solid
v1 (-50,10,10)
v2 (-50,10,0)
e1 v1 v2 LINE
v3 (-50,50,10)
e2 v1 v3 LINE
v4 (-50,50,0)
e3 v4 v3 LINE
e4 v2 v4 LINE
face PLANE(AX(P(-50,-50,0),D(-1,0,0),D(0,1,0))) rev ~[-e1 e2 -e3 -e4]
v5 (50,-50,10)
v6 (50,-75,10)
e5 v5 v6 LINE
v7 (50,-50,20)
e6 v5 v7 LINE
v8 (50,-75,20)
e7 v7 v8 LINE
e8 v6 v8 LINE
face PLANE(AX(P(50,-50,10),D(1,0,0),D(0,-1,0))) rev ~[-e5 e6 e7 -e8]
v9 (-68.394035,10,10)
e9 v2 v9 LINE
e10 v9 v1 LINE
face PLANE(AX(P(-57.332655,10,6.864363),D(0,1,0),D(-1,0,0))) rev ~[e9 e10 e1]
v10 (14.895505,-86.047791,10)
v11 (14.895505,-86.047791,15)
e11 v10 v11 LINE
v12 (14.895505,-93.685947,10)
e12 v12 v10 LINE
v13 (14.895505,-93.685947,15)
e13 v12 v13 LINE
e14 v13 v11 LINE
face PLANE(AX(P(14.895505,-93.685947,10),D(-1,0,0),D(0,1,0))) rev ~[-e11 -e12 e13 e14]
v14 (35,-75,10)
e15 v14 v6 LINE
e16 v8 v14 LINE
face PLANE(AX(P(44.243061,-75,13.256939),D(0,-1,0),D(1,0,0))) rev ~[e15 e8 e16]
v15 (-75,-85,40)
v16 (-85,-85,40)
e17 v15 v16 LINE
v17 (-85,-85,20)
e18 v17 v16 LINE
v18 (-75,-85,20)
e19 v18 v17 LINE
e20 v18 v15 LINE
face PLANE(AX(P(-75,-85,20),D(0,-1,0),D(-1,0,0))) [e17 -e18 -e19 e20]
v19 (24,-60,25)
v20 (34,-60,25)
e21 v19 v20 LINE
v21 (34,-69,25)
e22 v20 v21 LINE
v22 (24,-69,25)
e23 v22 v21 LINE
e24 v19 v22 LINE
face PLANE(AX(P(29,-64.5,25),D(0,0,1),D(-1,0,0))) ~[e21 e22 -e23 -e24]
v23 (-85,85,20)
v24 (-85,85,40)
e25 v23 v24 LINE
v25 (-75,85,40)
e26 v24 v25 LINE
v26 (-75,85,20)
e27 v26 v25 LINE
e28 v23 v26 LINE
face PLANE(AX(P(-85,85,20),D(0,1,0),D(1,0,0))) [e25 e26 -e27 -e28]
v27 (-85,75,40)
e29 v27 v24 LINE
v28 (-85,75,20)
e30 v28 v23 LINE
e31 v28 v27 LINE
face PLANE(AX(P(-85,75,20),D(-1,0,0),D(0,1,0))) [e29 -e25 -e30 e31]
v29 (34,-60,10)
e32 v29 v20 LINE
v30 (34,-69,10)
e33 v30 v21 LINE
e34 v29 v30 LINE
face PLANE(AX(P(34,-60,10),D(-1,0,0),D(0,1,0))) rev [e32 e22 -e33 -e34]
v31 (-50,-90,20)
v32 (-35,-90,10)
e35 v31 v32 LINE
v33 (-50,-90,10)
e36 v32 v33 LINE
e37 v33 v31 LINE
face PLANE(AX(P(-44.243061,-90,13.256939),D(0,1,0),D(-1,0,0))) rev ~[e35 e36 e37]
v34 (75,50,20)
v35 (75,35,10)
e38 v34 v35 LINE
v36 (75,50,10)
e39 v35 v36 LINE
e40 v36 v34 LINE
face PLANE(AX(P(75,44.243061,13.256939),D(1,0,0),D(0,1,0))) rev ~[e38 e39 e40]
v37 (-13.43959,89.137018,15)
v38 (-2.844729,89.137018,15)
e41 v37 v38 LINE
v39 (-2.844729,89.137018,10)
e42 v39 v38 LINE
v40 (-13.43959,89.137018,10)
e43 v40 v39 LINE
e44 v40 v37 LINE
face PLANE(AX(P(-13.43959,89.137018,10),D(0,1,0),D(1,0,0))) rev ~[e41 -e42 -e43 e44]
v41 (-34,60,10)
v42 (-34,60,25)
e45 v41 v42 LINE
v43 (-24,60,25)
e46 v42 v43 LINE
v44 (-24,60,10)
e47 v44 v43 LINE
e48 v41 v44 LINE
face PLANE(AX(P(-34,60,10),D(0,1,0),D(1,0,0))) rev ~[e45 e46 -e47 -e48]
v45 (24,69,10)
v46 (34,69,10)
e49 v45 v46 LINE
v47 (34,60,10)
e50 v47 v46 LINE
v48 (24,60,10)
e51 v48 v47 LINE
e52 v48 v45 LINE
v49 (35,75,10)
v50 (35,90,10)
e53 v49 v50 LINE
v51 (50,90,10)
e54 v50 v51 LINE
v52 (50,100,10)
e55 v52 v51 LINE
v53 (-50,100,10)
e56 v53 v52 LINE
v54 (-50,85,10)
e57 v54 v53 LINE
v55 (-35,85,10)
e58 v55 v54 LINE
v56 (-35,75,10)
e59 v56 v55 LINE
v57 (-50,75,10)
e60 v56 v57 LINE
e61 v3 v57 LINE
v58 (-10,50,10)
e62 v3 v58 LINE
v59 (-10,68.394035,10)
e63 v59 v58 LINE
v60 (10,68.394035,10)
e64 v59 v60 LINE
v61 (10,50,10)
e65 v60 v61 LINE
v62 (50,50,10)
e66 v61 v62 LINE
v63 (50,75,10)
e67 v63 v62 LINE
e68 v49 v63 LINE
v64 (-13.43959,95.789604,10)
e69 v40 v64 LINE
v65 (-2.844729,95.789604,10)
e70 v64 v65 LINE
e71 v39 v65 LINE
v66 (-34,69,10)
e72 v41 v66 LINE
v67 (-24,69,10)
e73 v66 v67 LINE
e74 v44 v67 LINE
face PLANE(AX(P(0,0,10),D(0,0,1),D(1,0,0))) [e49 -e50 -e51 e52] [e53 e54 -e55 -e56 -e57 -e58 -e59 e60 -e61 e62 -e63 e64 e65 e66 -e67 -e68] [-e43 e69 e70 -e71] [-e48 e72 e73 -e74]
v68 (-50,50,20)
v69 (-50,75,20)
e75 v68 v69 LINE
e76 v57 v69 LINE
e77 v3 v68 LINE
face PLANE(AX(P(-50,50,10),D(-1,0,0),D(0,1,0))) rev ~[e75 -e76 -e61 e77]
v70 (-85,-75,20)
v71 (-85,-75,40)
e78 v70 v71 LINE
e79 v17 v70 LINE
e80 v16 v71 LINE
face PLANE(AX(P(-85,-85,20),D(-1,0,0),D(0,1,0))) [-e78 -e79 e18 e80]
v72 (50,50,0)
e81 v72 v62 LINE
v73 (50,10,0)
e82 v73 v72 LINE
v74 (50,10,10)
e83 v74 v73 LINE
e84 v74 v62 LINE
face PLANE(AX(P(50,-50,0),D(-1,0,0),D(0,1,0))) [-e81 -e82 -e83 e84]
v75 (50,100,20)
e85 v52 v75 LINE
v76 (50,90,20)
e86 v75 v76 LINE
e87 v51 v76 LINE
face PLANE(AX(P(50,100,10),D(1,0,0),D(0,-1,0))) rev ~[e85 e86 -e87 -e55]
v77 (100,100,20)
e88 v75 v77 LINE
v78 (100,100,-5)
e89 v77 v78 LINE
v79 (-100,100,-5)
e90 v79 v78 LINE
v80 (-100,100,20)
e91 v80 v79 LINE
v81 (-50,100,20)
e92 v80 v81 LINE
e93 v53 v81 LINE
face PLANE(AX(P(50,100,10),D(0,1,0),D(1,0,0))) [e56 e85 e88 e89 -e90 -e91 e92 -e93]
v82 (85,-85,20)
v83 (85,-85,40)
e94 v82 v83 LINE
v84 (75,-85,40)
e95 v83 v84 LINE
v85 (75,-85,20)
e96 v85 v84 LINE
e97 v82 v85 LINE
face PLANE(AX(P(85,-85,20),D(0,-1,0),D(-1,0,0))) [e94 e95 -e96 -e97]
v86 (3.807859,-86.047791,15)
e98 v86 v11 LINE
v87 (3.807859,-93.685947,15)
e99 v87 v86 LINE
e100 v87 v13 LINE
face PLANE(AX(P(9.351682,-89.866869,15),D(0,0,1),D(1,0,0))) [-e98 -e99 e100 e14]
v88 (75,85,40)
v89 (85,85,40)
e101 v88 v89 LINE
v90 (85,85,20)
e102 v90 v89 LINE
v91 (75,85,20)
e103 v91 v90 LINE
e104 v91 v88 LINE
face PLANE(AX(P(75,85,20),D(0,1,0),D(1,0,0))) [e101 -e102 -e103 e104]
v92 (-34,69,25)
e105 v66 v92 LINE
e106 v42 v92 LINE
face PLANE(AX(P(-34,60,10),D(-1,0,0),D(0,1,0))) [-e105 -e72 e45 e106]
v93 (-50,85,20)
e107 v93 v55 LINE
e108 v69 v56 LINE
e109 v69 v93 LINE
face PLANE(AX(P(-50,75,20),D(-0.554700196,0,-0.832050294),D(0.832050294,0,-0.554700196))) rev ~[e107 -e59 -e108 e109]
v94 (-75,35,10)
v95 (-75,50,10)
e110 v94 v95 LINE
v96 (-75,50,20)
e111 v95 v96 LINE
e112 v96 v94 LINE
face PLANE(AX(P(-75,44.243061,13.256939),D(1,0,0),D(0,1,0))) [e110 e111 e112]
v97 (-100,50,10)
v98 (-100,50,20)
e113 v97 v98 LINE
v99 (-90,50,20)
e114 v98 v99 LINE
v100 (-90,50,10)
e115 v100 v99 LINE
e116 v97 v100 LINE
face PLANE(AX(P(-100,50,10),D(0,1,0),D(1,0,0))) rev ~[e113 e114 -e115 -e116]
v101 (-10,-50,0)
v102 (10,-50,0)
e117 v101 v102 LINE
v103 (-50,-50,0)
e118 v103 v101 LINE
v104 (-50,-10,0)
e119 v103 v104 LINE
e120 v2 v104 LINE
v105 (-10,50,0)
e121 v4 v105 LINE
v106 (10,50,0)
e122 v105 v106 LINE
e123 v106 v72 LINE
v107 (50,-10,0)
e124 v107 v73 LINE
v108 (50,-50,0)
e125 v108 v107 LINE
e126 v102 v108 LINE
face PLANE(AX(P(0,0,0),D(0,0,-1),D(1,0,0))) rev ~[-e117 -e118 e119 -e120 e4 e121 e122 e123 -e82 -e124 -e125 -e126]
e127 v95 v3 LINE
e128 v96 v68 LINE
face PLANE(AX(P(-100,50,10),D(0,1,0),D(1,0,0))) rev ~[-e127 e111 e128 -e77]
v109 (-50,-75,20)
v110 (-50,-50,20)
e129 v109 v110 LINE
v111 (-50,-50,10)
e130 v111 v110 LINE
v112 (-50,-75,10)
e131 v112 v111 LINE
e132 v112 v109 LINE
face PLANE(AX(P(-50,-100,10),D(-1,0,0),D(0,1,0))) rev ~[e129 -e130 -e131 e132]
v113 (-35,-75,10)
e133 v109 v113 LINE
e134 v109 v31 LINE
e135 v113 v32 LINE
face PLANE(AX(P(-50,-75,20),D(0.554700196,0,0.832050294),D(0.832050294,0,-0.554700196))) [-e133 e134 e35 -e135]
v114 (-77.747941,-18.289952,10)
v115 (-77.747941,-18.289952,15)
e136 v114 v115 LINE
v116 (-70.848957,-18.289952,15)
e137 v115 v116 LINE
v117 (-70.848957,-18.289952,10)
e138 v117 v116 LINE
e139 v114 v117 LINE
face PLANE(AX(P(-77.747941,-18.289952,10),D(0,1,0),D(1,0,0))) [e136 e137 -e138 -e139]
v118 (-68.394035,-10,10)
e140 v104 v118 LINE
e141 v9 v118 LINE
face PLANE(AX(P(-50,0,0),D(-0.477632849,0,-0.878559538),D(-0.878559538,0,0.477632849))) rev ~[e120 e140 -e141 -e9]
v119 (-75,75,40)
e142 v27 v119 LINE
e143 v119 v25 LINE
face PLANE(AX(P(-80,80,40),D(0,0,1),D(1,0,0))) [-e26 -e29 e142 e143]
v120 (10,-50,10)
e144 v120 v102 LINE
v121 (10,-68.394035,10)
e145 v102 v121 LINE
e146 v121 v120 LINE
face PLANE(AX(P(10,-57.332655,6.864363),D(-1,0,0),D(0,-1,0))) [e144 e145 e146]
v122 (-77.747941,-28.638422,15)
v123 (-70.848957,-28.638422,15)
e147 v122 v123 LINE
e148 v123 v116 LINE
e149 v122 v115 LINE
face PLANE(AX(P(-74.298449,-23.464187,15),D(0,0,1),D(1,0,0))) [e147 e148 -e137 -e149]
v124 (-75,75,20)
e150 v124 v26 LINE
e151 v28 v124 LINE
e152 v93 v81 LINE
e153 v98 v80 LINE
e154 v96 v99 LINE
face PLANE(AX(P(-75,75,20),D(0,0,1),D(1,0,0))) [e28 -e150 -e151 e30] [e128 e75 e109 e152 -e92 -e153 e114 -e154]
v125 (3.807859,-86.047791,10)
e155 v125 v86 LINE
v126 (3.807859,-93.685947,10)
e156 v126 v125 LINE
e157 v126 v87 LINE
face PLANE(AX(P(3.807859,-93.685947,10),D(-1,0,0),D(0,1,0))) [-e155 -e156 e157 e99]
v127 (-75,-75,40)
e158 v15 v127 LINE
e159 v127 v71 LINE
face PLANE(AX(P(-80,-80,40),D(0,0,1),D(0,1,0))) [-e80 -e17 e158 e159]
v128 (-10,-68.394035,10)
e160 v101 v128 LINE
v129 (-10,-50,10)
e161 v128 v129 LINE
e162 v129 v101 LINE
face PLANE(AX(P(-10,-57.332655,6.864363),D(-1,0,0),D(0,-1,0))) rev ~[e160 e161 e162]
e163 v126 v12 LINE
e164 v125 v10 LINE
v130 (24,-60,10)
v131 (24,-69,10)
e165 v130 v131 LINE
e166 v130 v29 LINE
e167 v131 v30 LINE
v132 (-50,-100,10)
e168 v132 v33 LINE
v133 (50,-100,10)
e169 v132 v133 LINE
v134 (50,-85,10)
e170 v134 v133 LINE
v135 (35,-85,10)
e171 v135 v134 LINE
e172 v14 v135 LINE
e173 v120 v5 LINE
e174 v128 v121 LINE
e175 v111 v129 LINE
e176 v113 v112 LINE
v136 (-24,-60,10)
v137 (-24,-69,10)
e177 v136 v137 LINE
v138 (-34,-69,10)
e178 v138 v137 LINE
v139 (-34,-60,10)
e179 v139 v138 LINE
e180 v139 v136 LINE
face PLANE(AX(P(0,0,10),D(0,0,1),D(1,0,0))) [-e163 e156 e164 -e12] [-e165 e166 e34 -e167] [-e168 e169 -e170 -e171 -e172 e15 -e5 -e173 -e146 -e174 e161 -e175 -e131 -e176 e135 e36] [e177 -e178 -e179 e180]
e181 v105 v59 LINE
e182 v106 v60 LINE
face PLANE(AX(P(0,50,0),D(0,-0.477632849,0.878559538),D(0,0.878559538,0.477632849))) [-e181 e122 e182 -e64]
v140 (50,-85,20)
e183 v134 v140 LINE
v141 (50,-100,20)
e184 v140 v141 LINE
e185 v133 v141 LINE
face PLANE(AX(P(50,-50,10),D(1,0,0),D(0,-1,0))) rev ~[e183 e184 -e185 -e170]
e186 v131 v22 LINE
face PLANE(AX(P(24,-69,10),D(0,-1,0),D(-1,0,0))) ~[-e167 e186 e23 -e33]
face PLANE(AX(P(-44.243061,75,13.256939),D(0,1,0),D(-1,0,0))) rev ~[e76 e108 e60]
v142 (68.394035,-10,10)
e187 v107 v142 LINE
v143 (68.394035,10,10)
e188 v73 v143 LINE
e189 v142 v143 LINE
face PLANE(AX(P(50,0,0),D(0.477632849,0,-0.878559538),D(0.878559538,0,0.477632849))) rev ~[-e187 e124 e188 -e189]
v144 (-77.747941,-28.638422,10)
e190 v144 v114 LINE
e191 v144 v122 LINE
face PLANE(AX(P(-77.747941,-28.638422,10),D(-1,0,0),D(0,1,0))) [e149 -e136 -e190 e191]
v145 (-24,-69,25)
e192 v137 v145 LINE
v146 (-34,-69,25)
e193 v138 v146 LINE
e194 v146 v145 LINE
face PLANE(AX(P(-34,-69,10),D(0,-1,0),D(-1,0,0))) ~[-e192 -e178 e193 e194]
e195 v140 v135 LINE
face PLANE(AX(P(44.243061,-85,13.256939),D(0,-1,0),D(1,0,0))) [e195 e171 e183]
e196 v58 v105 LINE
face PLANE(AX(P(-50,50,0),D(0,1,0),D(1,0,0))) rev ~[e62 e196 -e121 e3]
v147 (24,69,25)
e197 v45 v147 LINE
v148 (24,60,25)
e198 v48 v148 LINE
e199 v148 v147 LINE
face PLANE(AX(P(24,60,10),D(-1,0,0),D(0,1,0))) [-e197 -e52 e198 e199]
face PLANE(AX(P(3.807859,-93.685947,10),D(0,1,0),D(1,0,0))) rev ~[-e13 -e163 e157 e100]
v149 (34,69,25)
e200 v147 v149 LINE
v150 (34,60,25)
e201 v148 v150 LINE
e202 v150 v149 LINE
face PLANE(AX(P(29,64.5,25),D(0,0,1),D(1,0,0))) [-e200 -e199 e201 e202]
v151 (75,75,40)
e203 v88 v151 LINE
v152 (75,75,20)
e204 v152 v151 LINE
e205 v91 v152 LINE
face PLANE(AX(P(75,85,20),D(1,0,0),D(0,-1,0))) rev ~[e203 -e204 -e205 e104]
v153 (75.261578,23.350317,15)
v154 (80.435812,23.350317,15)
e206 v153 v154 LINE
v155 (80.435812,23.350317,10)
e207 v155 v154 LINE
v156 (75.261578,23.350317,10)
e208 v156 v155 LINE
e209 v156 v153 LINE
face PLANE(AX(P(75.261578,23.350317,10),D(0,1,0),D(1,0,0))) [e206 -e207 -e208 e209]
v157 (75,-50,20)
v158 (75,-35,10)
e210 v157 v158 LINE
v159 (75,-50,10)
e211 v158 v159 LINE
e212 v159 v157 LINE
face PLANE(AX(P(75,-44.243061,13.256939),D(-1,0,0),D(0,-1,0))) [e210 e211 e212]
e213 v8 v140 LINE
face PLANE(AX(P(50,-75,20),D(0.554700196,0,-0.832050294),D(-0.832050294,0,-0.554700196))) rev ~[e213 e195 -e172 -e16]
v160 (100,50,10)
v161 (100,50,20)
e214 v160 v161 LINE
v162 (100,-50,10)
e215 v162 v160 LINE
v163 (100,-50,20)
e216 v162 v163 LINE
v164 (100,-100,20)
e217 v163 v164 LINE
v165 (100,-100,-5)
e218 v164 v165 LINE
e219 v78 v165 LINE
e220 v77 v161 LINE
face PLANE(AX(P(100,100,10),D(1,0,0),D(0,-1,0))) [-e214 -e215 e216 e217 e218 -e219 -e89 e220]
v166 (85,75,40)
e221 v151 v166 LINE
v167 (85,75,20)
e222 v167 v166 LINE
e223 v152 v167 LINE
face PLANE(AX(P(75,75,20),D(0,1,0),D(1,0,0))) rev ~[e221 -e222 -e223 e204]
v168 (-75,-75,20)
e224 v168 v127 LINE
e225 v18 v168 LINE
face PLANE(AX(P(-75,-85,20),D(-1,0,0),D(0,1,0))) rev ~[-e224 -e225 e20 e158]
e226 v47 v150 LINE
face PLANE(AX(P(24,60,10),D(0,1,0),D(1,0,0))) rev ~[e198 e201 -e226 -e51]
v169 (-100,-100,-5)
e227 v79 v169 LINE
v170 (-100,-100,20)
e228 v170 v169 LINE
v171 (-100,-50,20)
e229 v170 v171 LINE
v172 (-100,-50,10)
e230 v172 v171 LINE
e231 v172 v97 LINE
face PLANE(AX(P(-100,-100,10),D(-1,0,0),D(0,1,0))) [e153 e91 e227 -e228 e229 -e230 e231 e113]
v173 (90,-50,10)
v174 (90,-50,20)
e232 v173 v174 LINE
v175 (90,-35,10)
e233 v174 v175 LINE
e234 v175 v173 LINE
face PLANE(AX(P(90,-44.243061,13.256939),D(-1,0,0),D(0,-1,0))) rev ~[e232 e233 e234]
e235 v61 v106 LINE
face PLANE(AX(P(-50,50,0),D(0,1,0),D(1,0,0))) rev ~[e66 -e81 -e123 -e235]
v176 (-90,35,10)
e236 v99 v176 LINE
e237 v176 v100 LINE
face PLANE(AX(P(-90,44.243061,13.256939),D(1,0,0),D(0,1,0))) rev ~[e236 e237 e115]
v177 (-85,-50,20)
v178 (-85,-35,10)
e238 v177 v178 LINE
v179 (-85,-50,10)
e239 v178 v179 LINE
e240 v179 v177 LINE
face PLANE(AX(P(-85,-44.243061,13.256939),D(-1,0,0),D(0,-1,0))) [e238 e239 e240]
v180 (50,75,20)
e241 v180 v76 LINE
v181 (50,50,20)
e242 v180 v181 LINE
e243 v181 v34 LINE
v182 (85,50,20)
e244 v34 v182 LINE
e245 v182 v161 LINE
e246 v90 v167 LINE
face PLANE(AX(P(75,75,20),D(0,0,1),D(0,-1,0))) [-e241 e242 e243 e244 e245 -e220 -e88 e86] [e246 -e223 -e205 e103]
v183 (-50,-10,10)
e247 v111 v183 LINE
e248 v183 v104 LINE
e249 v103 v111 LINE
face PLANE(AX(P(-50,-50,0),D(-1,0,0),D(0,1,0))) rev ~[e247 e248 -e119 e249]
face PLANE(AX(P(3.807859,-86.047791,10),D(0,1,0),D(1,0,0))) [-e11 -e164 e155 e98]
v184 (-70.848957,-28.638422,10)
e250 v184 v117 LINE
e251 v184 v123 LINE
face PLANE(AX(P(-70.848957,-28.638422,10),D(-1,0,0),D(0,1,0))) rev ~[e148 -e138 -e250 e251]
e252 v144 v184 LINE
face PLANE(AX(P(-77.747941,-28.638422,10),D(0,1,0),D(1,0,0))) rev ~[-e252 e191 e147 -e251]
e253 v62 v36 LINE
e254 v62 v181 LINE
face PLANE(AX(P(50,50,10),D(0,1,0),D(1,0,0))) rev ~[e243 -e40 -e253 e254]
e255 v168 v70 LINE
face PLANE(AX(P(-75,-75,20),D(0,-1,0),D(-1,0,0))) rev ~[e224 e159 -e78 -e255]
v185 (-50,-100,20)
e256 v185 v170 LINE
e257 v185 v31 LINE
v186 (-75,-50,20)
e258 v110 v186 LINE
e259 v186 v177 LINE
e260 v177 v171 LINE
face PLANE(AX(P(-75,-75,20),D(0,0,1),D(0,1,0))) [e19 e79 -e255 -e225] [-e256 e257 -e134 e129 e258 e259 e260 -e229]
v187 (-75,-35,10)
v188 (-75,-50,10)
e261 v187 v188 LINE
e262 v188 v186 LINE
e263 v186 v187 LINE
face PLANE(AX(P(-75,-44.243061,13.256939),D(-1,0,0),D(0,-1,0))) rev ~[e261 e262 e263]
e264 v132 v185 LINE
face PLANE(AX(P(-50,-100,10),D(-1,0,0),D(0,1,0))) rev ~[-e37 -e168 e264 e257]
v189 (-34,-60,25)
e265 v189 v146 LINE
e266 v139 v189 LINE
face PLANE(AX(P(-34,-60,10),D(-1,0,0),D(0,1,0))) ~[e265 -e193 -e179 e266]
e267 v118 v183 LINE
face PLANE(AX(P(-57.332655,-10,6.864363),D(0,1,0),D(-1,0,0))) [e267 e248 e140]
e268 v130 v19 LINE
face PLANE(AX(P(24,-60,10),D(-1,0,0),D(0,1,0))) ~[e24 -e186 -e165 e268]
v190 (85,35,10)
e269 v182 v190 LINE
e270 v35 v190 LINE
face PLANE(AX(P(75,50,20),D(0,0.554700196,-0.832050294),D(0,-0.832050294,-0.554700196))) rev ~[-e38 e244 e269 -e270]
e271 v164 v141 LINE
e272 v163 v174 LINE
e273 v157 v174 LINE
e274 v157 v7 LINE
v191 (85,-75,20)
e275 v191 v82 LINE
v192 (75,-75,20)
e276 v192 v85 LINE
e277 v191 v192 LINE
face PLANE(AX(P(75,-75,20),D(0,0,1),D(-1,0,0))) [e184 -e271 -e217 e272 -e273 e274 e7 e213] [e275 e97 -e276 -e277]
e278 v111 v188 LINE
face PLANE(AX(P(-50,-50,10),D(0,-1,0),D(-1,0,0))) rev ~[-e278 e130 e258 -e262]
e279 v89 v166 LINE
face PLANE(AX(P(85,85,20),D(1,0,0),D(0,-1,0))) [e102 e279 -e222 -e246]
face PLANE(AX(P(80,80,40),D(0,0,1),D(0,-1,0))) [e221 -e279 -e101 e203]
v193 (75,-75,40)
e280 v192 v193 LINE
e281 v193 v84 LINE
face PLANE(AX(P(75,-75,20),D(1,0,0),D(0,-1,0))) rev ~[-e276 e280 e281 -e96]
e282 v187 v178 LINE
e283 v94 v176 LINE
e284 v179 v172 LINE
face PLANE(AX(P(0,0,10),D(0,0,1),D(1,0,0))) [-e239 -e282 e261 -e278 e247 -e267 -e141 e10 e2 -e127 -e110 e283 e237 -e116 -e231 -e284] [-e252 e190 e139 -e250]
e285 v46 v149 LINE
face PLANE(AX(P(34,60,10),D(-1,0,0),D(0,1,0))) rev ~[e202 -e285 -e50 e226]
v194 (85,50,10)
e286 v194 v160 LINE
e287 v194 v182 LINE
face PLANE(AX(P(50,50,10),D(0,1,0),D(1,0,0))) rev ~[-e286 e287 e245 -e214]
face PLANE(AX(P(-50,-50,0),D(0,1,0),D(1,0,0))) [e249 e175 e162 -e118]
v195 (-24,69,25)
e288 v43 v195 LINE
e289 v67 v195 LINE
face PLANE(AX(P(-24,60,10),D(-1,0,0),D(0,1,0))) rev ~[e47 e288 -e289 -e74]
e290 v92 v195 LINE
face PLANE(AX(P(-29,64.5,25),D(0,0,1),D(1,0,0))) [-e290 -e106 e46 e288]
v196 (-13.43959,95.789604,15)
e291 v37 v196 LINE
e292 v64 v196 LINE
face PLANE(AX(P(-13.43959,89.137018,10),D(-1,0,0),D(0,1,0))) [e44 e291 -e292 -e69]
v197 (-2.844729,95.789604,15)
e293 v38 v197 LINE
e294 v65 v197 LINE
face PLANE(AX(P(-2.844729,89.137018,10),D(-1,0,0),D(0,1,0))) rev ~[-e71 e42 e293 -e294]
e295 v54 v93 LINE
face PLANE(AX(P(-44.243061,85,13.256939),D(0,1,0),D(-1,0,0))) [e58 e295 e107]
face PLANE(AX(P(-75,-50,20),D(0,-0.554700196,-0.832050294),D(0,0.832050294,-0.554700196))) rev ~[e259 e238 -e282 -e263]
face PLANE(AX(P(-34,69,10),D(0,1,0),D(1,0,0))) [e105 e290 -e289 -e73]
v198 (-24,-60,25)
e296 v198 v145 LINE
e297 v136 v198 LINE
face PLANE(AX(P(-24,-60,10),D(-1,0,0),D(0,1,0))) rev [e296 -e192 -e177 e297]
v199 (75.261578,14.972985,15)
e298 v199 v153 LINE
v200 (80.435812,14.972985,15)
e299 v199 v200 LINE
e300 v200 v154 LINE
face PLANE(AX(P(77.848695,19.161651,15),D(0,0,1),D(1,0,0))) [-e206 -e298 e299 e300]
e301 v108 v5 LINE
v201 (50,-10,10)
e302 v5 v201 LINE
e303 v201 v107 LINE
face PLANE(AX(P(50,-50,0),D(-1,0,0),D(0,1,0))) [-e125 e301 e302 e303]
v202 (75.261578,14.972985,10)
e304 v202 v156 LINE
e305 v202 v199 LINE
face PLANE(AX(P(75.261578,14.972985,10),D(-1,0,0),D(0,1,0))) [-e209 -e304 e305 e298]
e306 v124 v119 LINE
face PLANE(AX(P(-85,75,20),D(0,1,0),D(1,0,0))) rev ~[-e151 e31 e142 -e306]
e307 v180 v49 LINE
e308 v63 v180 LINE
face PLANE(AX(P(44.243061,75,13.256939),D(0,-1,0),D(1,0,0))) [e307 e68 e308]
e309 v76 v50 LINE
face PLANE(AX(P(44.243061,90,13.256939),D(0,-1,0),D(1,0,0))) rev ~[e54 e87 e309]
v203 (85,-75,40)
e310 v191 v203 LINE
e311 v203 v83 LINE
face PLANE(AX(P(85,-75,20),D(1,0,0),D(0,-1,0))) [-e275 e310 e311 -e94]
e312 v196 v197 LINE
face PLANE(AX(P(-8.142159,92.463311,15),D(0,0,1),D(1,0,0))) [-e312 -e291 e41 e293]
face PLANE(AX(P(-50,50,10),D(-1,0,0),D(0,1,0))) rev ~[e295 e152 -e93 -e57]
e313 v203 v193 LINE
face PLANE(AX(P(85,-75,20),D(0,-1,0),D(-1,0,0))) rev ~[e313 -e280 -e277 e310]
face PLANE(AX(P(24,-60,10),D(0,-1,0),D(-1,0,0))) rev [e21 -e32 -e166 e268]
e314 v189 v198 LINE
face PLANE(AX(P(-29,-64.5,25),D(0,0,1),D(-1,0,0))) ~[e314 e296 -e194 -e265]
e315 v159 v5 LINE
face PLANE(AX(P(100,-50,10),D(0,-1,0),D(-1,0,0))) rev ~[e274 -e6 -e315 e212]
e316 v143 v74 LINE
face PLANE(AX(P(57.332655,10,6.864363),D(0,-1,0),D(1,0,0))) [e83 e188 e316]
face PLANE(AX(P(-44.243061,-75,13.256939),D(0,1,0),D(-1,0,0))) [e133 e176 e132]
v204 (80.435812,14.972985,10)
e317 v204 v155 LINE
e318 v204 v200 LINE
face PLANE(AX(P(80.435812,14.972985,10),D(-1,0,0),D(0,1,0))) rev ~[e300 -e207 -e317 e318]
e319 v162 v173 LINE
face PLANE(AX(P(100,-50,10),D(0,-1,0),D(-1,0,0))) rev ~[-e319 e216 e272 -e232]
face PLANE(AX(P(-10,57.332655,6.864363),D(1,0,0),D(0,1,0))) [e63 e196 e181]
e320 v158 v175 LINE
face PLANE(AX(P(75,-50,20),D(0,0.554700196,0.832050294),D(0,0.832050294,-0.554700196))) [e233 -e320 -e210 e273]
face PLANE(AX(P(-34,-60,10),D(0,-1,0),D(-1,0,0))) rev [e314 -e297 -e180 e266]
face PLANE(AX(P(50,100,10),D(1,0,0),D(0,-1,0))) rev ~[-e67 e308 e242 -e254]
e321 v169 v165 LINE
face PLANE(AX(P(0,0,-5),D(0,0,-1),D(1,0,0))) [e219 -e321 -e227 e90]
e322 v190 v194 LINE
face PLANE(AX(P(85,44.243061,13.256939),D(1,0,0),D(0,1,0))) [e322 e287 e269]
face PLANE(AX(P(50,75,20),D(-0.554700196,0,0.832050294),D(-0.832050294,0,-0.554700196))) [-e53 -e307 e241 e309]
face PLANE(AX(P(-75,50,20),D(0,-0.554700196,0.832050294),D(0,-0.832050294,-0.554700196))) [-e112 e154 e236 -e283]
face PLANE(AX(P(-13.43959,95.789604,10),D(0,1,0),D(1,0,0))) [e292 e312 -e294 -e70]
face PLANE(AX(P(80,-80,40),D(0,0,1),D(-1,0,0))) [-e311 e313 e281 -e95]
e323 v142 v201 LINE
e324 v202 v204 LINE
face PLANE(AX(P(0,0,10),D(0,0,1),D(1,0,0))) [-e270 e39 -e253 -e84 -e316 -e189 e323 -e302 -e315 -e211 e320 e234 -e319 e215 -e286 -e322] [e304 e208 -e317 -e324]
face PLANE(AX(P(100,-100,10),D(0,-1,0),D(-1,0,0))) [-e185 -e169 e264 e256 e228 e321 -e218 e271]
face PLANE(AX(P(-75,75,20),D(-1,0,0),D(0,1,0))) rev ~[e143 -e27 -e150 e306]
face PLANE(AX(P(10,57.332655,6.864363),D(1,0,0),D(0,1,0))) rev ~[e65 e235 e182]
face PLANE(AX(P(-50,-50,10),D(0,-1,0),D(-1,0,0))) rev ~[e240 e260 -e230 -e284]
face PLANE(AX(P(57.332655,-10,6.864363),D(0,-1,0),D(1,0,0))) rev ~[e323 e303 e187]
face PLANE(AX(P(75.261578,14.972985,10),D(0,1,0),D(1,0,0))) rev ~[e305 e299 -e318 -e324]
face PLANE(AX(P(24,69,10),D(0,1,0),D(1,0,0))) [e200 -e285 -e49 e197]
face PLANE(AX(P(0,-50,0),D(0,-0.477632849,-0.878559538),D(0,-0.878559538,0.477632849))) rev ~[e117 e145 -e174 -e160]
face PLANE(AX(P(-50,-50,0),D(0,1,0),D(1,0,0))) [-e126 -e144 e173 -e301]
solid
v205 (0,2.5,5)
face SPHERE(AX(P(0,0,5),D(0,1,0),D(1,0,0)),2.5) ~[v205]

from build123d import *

# Parameters (mm, degrees)
F0_W             = 200
F0_H             = 200
F0_W_2           = 100
F0_H_2           = 100
F1_DEPTH         = 10
F2_W             = 200
F2_H             = 200
F3_DEPTH         = 5
F5_DEPTH         = 10
F5_DEPTH_BACK    = 10
F5_COPIES_COUNT  = 4
F7_W             = 50
F7_H             = 50
F8_DEPTH         = 10
F8_COPIES_COUNT  = 4
F12_DEPTH        = 10
F12_COPIES_COUNT = 4
F15_DEPTH        = 15
F15_COPIES_COUNT = 4
F9_W             = 10
F9_H             = 10
F17_DEPTH        = 20
F17_COPIES_COUNT = 4
F18_W            = 10
F18_H            = 9
F19_DEPTH        = 15
F21_W            = 5.1742345095
F21_H            = 8.3773322403
F21_W_2          = 10.5948613491
F21_H_2          = 6.6525861621
F21_W_3          = 6.898984313
F21_H_3          = 10.3484708816
F21_W_4          = 11.0876462422
F21_H_4          = 7.638156414
F22_DEPTH        = 5


# Not quite as in the source:
# - a pattern or mirror of a feature is missing from the dataset's text; its kind, count and spacing are read off the source's solid


with BuildPart() as f1:
    # F0 (on Top) → F1 (new body)
    with BuildSketch(Plane.XY):
        Rectangle(F0_W, F0_H)
        Rectangle(F0_W_2, F0_H_2, mode=Mode.SUBTRACT)
    extrude(amount=F1_DEPTH)

    # F2 (on face) → F3 (join)
    with BuildSketch(Plane(origin=(0, 0, 0), x_dir=(1, 0, 0), z_dir=(0, 0, -1))):
        Rectangle(F2_W, F2_H)
    extrude(amount=F3_DEPTH)

    # F4 (on Right) → F5 (cut, two sides)
    with BuildSketch(Plane.YZ) as f5_sk:
        Polygon((68.3940351009, 10), (50, 10), (50, 0), align=None)
    f5 = extrude(amount=-F5_DEPTH, mode=Mode.SUBTRACT) + extrude(f5_sk.sketch, amount=F5_DEPTH_BACK, mode=Mode.SUBTRACT)

    # F5_copies: F5 ×4 about axis
    f5_copies_axis = Axis((0, 0, 0), (0, 0, 1))
    for i in range(1, F5_COPIES_COUNT):
        add(f5.rotate(f5_copies_axis, i * 360 / F5_COPIES_COUNT), mode=Mode.SUBTRACT)

    # F7 (on face) → F8 (join)
    with BuildSketch(Plane.XY.offset(10)):
        with Locations((-75, 75)):
            Rectangle(F7_W, F7_H)
    f8 = extrude(amount=F8_DEPTH)

    # F8_copies: F8 ×4 about axis
    f8_copies_axis = Axis((0, 0, 0), (0, 0, 1))
    for i in range(1, F8_COPIES_COUNT):
        add(f8.rotate(f8_copies_axis, i * 360 / F8_COPIES_COUNT))

    # F11 (on line) → F12 (join)
    with BuildSketch(Plane(origin=(0, 75, 0), x_dir=(-1, 0, 0), z_dir=(0, 1, 0))):
        Polygon((50, 10), (50, 20), (35, 10), align=None)
    f12 = extrude(amount=F12_DEPTH)

    # F12_copies: F12 ×4 about axis
    f12_copies_axis = Axis((0, 0, 0), (0, 0, 1))
    for i in range(1, F12_COPIES_COUNT):
        add(f12.rotate(f12_copies_axis, i * 360 / F12_COPIES_COUNT))

    # F14 (on line) → F15 (join)
    with BuildSketch(Plane.YZ.offset(-75)):
        Polygon((50, 10), (50, 20), (35, 10), align=None)
    f15 = extrude(amount=-F15_DEPTH)

    # F15_copies: F15 ×4 about axis
    f15_copies_axis = Axis((0, 0, 0), (0, 0, 1))
    for i in range(1, F15_COPIES_COUNT):
        add(f15.rotate(f15_copies_axis, i * 360 / F15_COPIES_COUNT))

    # F9 (on face) → F17 (join)
    with BuildSketch(Plane.XY.offset(20)):
        with Locations((-80, 80)):
            Rectangle(F9_W, F9_H)
    f17 = extrude(amount=F17_DEPTH)

    # F17_copies: F17 ×4 about axis
    f17_copies_axis = Axis((0, 0, 0), (0, 0, 1))
    for i in range(1, F17_COPIES_COUNT):
        add(f17.rotate(f17_copies_axis, i * 360 / F17_COPIES_COUNT))

    # F18 (on face) → F19 (join)
    with BuildSketch(Plane.XY.offset(10)):
        with Locations((-29, 64.5)):
            Rectangle(F18_W, F18_H)
        with Locations((29, 64.5)):
            Rectangle(F18_W, F18_H)
    f19 = extrude(amount=F19_DEPTH)

    # F19_copies: F19 across plane
    add(f19.mirror(Plane(origin=(0, 0, 0), x_dir=(0, 0, -1), z_dir=(0, -1, 0))))

    # F21 (on face) → F22 (join)
    with BuildSketch(Plane.XY.offset(10)):
        with Locations((77.8486952186, 19.161650911)):
            Rectangle(F21_W, F21_H)
        with Locations((-8.1421594368, 92.4633108079)):
            Rectangle(F21_W_2, F21_H_2)
        with Locations((-74.2984488606, -23.4641870484)):
            Rectangle(F21_W_3, F21_H_3)
        with Locations((9.3516821507, -89.8668691516)):
            Rectangle(F21_W_4, F21_H_4)
    extrude(amount=F22_DEPTH)


with BuildPart() as f25:
    # F24 (on offset) → F25 (revolve)
    with BuildSketch(Plane.XY.offset(5)):
        with BuildLine():
            Line((0, 2.5), (0, -2.5))
            ThreePointArc((0, -2.5), (2.5, 0), (0, 2.5))
        make_face()
    revolve(axis=Axis((0, 0.5305833183, 5), (0, -1, 0)))


solid = Compound([f1.part, f25.part])
